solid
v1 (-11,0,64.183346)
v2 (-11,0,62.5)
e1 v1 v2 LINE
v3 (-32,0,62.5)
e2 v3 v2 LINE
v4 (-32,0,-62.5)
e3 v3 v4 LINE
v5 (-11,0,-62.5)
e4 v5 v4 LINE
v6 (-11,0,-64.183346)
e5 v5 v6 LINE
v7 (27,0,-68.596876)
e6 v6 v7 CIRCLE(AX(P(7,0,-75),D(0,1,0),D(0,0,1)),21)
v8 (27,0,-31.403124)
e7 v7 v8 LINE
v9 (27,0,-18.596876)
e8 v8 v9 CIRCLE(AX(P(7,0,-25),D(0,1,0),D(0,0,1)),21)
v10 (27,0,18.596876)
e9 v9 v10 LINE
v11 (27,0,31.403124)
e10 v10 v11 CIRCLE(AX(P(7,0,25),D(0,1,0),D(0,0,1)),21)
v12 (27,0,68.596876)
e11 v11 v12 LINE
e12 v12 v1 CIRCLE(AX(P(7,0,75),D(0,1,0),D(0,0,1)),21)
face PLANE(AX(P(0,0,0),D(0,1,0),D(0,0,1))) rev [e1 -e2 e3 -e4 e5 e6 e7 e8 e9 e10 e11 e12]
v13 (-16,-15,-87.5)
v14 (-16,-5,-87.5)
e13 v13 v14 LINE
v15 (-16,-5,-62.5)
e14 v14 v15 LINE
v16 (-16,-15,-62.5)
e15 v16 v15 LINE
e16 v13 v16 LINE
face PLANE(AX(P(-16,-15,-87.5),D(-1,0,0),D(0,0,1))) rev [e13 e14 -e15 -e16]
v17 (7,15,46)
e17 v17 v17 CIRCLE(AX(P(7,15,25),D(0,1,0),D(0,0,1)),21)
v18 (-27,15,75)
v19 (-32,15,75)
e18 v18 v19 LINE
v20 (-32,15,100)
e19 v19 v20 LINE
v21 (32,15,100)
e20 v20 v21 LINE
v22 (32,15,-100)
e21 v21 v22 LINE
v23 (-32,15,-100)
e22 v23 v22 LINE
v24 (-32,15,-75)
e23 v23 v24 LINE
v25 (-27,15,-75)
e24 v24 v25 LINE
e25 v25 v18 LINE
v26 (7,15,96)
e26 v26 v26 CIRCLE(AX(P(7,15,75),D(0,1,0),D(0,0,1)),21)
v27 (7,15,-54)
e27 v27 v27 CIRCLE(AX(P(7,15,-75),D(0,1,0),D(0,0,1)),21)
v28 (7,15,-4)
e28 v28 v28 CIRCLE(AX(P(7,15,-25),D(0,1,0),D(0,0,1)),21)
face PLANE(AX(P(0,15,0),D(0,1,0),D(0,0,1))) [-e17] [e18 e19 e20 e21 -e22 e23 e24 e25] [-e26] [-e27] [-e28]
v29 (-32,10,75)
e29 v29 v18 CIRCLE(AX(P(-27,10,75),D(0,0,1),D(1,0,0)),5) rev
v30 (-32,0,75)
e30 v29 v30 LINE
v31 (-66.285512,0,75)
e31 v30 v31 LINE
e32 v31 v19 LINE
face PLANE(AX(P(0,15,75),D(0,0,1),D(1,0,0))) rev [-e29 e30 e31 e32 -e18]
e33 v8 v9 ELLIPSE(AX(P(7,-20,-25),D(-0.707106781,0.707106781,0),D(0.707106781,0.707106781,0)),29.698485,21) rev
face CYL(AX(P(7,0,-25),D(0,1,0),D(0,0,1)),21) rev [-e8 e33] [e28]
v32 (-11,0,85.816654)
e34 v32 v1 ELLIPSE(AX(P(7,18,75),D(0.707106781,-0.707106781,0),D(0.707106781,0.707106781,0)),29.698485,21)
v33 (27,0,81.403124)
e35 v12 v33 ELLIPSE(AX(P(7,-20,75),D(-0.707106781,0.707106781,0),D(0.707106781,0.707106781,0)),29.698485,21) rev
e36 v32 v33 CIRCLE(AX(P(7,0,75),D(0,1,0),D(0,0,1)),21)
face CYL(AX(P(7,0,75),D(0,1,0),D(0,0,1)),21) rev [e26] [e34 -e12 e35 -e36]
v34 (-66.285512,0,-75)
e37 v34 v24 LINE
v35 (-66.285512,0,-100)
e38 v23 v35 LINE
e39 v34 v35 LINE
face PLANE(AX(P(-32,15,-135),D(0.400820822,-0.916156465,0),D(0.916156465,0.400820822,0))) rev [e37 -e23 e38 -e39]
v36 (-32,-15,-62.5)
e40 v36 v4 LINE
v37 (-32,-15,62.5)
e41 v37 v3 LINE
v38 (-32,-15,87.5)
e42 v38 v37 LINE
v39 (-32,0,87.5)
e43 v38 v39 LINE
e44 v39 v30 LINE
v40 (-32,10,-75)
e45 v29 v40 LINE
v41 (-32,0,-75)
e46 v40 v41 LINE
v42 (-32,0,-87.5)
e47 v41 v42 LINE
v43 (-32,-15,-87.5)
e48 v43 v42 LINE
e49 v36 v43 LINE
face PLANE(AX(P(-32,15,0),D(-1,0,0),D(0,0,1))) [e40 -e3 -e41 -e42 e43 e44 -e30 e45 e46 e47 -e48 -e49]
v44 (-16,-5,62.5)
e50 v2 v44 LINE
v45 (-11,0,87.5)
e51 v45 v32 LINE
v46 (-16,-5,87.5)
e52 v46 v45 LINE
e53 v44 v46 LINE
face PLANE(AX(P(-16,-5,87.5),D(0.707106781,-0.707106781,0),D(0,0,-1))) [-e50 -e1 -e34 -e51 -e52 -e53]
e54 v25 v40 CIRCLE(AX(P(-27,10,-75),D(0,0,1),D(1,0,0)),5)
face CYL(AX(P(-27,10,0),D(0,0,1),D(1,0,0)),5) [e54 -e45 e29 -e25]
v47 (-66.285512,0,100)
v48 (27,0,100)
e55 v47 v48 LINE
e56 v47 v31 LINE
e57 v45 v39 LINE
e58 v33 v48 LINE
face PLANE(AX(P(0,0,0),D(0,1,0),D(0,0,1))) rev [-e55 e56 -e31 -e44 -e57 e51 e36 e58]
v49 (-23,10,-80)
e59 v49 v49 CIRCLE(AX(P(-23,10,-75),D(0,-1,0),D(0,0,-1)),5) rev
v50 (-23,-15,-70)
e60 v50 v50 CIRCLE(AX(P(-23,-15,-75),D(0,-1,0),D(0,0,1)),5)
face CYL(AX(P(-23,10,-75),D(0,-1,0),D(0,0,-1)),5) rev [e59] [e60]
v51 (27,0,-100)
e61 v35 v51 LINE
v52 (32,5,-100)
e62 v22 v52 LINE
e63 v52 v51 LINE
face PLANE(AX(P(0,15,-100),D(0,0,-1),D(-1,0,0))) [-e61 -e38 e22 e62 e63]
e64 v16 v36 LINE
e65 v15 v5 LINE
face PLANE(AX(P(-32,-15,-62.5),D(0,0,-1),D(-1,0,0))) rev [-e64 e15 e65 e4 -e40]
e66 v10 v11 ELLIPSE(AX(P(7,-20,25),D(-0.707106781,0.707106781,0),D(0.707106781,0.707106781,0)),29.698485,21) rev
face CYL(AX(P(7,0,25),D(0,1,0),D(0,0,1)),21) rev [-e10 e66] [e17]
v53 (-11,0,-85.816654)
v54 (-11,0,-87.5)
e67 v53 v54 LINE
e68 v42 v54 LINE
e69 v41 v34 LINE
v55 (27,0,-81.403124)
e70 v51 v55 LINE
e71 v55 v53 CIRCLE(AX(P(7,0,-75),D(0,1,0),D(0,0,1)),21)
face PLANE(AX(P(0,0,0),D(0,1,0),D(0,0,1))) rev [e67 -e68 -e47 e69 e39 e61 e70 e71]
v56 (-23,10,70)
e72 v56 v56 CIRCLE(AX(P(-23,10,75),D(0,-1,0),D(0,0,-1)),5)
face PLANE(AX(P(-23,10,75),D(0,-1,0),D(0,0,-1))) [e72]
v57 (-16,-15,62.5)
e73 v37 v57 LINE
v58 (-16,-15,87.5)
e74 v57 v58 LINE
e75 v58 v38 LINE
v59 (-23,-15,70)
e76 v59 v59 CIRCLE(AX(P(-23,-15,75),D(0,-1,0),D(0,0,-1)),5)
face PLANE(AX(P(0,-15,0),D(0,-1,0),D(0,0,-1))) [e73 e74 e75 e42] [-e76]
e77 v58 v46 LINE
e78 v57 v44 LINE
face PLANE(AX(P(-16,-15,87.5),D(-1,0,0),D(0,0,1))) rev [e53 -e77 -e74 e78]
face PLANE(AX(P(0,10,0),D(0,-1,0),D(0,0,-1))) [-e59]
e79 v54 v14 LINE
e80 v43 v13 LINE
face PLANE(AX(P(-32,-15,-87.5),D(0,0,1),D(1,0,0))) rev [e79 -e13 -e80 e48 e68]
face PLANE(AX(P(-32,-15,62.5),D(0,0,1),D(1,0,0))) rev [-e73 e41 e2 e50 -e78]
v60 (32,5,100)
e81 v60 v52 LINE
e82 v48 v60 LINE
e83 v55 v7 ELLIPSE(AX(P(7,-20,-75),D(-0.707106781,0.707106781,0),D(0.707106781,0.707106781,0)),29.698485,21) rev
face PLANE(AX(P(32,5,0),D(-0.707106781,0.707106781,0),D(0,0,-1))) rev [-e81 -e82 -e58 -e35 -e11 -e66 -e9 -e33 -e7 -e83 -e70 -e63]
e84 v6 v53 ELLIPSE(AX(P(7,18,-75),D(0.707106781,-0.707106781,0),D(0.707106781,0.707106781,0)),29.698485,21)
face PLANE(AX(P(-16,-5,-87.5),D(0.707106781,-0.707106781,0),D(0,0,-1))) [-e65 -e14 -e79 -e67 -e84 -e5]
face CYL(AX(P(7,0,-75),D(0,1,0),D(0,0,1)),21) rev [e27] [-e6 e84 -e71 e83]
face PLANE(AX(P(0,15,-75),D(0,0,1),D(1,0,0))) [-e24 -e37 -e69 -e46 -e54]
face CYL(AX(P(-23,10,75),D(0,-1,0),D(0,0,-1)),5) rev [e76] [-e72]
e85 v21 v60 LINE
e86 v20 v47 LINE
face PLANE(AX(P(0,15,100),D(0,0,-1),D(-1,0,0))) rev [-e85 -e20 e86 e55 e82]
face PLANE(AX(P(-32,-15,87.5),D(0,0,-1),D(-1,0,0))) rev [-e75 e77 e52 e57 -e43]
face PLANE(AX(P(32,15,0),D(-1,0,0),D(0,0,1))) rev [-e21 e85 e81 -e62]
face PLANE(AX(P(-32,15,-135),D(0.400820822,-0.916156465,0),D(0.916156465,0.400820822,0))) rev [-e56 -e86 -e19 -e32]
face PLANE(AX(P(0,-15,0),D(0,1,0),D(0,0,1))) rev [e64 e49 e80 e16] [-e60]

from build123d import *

# Parameters (mm, degrees)
EXTRUDE_1_DEPTH     = 15
SKETCH_3_3_W        = 35
SKETCH_3_3_H        = 25
EXTRUDE_2_DEPTH     = 15
CUT_EXTRUDE_1_DEPTH = 245
SKETCH_7_R          = 21
CUT_EXTRUDE_2_DEPTH = 15
SKETCH_8_R          = 5
CUT_EXTRUDE_4_DEPTH = 10
EXTRUDE_START       = 15
SKETCH_8_5_W        = 16
SKETCH_8_5_H        = 25
SKETCH_8_5_R        = 5
EXTRUDE_4_DEPTH     = 15
CHAMFER_1_SIZE      = 5
FILLET_1_R          = 5
CHAMFER_2_SIZE      = 5


with BuildPart() as part:
    # Эскиз3 → Бобышка-Вытянуть1 (new body)
    with BuildSketch(Plane(origin=(0, 0, 0), x_dir=(1, 0, 0), z_dir=(0, 1, 0))):
        Polygon((-32, -75), (-32, 75), (-32, 100), (32, 100), (32, -100), (-32, -100), align=None)
    extrude(amount=EXTRUDE_1_DEPTH)

    # Эскиз3<3> → Бобышка-Вытянуть2 (add)
    with BuildSketch(Plane(origin=(0, 0, 0), x_dir=(1, 0, 0), z_dir=(0, 1, 0))):
        with Locations((-49.5, 87.5)):
            Rectangle(SKETCH_3_3_W, SKETCH_3_3_H)
        with Locations((-49.5, -87.5)):
            Rectangle(SKETCH_3_3_W, SKETCH_3_3_H)
    extrude(amount=EXTRUDE_2_DEPTH)

    # Эскиз6 → Вырез-Вытянуть1 (cut)
    with BuildSketch(Plane.XY.offset(110)):
        Polygon((-67, 15), (-32, 15), (-67, -0.312590504), align=None)
    extrude(amount=-CUT_EXTRUDE_1_DEPTH, mode=Mode.SUBTRACT)

    # Эскиз7 → Вырез-Вытянуть2 (cut)
    with BuildSketch(Plane(origin=(0, 15, 0), x_dir=(1, 0, 0), z_dir=(0, 1, 0))):
        with Locations(Location((7, 75, 0), (0, 0, 270))):
            Circle(SKETCH_7_R)
        with Locations(Location((7, 25, 0), (0, 0, 270))):
            Circle(SKETCH_7_R)
        with Locations(Location((7, -25, 0), (0, 0, 270))):
            Circle(SKETCH_7_R)
        with Locations(Location((7, -75, 0), (0, 0, 270))):
            Circle(SKETCH_7_R)
    extrude(amount=-CUT_EXTRUDE_2_DEPTH, mode=Mode.SUBTRACT)

    # Эскиз8 → Вырез-Вытянуть4 (cut)
    with BuildSketch(Plane(origin=(0, 0, 0), x_dir=(-1, 0, 0), z_dir=(0, -1, 0))):
        with Locations(Location((23, 75, 0), (0, 0, 90))):
            Circle(SKETCH_8_R)
        with Locations(Location((23, -75, 0), (0, 0, 90))):
            Circle(SKETCH_8_R)
    extrude(amount=-CUT_EXTRUDE_4_DEPTH, mode=Mode.SUBTRACT)

    # Эскиз8<5> → Бобышка-Вытянуть4 (add)
    # profile 1 of 2: a face of its own
    with BuildSketch(Plane(origin=(0, 0, 0), x_dir=(-1, 0, 0), z_dir=(0, -1, 0)).offset(EXTRUDE_START)):
        with Locations((24, 75)):
            Rectangle(SKETCH_8_5_W, SKETCH_8_5_H)
        with Locations(Location((23, 75, 0), (0, 0, 90))):
            Circle(SKETCH_8_5_R, mode=Mode.SUBTRACT)
    # profile 2 of 2: a face of its own
    with BuildSketch(Plane(origin=(0, 0, 0), x_dir=(-1, 0, 0), z_dir=(0, -1, 0)).offset(EXTRUDE_START)):
        with Locations((24, -75)):
            Rectangle(SKETCH_8_5_W, SKETCH_8_5_H)
        with Locations(Location((23, -75, 0), (0, 0, 90))):
            Circle(SKETCH_8_5_R, mode=Mode.SUBTRACT)
    extrude(amount=-EXTRUDE_4_DEPTH)

    # Фаска1
    # the kernel refuses this chamfer: 5 mm, written as the material it takes off along each edge
    with BuildSketch(Plane(origin=(32, 0, -112.85841494), x_dir=(0.027495876610586317, 0.9996219169112968, 0), z_dir=(0, 0, 1))) as chamfer_1_piece_1:
        Polygon((CHAMFER_1_SIZE * 0.999621916911, CHAMFER_1_SIZE * 0.0274958766106), (-CHAMFER_1_SIZE * 0.0274958766106, CHAMFER_1_SIZE * 0.999621916911), (0, 0), align=None)
    extrude(amount=225.71682988, mode=Mode.SUBTRACT)

    # Скругление1
    fillet_1_edges = [part.edges().sort_by_distance(p)[0] for p in [
        (-32, 15, 0),
    ]]
    fillet(fillet_1_edges, radius=FILLET_1_R)

    # Фаска2
    # the kernel refuses this chamfer: 5 mm, written as the material it adds along each edge
    with BuildSketch(Plane(origin=(-16, 0, 87.5), x_dir=(0.9996219169112968, 0.027495876610586372, 0), z_dir=(0, 0, -1))) as chamfer_2_piece_1_section:
        Polygon((CHAMFER_2_SIZE * 0.999621916911, CHAMFER_2_SIZE * 0.0274958766106), (-CHAMFER_2_SIZE * 0.0274958766106, CHAMFER_2_SIZE * 0.999621916911), (0, 0), align=None)
    chamfer_2_piece_1 = extrude(amount=25, mode=Mode.PRIVATE)
    chamfer_2_piece_1 = chamfer_2_piece_1 - Plane(origin=(7, -1.841726954, 75), x_dir=(0, 0, 1), z_dir=(0, 1, 0)) * Cylinder(21, 70, mode=Mode.PRIVATE)
    add(chamfer_2_piece_1)
    with BuildSketch(Plane(origin=(-16, 0, -62.5), x_dir=(0.9996219169112968, 0.027495876610586372, 0), z_dir=(0, 0, -1))) as chamfer_2_piece_2_section:
        Polygon((CHAMFER_2_SIZE * 0.999621916911, CHAMFER_2_SIZE * 0.0274958766106), (-CHAMFER_2_SIZE * 0.0274958766106, CHAMFER_2_SIZE * 0.999621916911), (0, 0), align=None)
    chamfer_2_piece_2 = extrude(amount=25, mode=Mode.PRIVATE)
    chamfer_2_piece_2 = chamfer_2_piece_2 - Plane(origin=(7, -1.841726954, -75), x_dir=(0, 0, 1), z_dir=(0, 1, 0)) * Cylinder(21, 70, mode=Mode.PRIVATE)
    add(chamfer_2_piece_2)


solid = part.part
